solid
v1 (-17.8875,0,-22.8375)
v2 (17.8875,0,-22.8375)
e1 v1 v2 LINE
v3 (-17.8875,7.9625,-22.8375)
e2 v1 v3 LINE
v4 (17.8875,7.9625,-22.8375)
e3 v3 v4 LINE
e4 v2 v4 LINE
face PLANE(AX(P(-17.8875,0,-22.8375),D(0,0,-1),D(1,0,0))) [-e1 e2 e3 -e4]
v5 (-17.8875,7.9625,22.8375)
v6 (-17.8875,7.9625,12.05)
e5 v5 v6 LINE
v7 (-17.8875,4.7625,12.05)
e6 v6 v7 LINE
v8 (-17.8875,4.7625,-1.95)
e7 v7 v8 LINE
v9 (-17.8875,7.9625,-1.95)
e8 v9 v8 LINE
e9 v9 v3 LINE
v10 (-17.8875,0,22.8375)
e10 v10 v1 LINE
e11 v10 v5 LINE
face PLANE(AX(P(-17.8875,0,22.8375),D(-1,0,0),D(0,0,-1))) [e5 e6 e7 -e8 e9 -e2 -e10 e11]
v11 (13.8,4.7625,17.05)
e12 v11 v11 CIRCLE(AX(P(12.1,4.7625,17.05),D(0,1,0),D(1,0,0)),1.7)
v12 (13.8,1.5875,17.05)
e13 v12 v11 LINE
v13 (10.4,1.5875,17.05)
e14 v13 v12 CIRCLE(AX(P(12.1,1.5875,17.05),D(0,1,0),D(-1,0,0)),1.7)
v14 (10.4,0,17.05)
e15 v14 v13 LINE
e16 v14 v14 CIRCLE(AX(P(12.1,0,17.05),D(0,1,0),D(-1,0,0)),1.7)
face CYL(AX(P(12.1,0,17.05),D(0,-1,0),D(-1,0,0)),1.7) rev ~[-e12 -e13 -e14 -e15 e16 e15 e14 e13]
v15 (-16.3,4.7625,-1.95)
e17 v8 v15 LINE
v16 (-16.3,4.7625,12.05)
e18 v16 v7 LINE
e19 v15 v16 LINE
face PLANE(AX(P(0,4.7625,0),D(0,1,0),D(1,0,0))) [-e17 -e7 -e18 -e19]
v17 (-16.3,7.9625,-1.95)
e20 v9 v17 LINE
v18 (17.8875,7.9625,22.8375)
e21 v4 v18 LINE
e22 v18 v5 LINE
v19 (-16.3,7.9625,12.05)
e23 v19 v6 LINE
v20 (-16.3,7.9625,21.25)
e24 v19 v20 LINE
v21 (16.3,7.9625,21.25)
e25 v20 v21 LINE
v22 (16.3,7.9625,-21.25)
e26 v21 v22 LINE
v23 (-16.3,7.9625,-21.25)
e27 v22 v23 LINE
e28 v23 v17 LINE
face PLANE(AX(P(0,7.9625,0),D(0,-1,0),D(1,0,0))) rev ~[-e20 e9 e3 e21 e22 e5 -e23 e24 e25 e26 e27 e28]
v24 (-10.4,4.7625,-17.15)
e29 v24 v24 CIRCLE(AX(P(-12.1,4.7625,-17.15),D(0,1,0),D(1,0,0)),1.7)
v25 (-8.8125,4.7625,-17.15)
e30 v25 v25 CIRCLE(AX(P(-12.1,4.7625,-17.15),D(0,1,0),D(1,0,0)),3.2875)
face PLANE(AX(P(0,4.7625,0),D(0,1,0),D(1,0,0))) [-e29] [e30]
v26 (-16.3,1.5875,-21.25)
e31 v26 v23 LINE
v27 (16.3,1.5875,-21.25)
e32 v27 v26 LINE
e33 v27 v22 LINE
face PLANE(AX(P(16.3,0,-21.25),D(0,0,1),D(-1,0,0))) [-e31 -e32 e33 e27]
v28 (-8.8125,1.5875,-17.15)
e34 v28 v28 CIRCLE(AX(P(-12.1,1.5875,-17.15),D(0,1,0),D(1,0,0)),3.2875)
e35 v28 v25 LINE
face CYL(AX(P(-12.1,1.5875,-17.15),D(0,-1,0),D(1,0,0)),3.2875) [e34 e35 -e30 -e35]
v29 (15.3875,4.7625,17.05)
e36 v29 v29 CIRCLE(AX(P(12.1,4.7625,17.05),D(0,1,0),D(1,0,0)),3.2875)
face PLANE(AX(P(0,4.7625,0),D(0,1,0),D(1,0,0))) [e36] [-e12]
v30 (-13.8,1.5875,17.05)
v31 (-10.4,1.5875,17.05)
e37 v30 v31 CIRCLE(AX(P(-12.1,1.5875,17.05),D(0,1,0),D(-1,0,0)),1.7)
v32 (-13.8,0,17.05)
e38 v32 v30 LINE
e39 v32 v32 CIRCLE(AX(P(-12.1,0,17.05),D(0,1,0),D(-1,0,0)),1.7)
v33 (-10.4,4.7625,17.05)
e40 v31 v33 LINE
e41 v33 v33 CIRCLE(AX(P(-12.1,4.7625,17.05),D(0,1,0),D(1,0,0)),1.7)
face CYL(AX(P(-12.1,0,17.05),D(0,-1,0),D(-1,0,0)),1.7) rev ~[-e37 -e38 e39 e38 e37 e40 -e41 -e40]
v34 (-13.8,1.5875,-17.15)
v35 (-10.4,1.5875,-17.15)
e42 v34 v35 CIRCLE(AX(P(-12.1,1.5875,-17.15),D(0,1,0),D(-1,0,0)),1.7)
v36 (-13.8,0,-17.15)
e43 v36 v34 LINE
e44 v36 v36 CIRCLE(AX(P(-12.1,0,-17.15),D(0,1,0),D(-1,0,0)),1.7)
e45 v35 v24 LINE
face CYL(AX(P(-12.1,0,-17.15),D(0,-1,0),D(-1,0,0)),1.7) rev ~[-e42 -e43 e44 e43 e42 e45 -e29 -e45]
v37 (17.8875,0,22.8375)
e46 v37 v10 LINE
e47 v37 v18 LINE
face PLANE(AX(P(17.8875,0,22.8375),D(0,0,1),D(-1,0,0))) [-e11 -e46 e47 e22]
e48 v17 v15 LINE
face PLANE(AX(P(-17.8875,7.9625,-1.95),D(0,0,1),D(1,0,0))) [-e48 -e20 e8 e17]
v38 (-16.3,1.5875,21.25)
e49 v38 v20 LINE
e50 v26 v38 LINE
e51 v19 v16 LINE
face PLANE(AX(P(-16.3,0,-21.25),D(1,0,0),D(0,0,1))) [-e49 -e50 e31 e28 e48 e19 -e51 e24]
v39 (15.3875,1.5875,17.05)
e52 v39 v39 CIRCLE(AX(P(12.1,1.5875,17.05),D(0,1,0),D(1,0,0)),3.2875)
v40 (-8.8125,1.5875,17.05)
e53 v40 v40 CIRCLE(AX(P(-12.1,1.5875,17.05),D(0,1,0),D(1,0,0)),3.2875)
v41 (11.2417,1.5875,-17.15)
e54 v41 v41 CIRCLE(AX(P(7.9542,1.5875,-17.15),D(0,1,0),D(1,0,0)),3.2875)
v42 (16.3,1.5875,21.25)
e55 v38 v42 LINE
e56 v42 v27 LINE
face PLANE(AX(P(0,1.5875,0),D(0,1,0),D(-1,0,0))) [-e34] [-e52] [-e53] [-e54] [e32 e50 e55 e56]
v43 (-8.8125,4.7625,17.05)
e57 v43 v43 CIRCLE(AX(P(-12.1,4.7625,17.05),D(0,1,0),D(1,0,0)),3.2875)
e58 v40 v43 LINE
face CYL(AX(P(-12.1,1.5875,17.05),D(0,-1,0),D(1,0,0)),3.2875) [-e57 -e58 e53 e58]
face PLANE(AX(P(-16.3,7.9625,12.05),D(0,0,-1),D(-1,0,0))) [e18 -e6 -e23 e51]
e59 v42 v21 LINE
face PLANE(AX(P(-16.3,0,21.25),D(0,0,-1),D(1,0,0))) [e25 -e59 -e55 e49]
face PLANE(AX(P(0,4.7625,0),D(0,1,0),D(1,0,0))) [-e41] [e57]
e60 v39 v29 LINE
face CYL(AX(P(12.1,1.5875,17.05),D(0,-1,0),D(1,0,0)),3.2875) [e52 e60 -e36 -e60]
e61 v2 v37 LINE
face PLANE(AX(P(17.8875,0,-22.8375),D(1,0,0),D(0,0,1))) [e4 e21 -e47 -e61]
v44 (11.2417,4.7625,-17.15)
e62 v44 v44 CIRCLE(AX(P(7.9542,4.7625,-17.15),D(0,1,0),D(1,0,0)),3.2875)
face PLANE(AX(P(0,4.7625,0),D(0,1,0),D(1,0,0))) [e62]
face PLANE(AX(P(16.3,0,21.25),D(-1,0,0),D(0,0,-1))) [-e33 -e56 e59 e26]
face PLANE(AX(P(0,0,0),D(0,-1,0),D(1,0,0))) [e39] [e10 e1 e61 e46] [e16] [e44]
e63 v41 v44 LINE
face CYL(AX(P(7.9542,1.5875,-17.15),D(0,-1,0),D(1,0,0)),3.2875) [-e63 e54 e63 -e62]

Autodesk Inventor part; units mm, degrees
ref_plane "YZ Plane" through (0, 0, 0) normal (1, 0, 0) x (0, 1, 0)
ref_plane "XZ Plane" through (0, 0, 0) normal (0, 1, 0) x (-1, 0, 0)
ref_plane "XY Plane" through (0, 0, 0) normal (0, 0, 1) x (1, 0, 0)
sketch "Sketch1" plane through (0, 0, 0) normal (0, 1, 0) x (-1, 0, 0)
  line L0 (16.3, 21.25) -> (-16.3, 21.25)
  line L1 (-16.3, 21.25) -> (-16.3, -21.25)
  line L2 (-16.3, -21.25) -> (16.3, -21.25)
  line L3 (16.3, -21.25) -> (16.3, 21.25)
  line L4 (16.3, 21.25) -> (-16.3, -21.25) construction
  line L5 (-16.3, 21.25) -> (16.3, -21.25) construction
  circle A0 centre (12.1, 17.05) radius 1.7
  circle A1 centre (12.1, -17.15) radius 1.7
  circle A2 centre (-12.1, 17.05) radius 1.7
  point P0 (0, 0)
  dimension "d0" = 42.5
  dimension "d1" = 32.6
  dimension "d4" = 3.4
  dimension "d5" = 3.4
  dimension "d6" = 3.4
  dimension "d7" = 34.2
  dimension "d8" = 24.2
  dimension "d9" = 4.2
  dimension "d10" = 4.2
  dimension "d11" = 4.2
  dimension "d12" = 4.2
extrude "Extrusion1" add sketch "Sketch1" along normal blind 1.5875
sketch "Sketch2" plane through (0, 1.5875, 0) normal (0, 1, 0) x (1, 0, 0)
  circle A0 centre (-12.1, -17.05) radius 1.7 projected
  circle A1 centre (-12.1, -17.05) radius 1.7
  circle A2 centre (-12.1, -17.05) radius 3.2875
  circle A3 centre (12.1, -17.05) radius 1.7 projected
  circle A4 centre (12.1, -17.05) radius 1.7
  circle A5 centre (12.1, -17.05) radius 3.2875
  circle A6 centre (-12.1, 17.15) radius 1.7 projected
  circle A7 centre (-12.1, 17.15) radius 1.7
  circle A8 centre (-12.1, 17.15) radius 3.2875
  line L0 (16.3, 21.25) -> (-16.3, 21.25) construction
  line L1 (0, 21.25) -> (0, -21.2058) construction
  circle A9 centre (7.9542, 17.15) radius 3.2875
  point P0 (0, 0)
  dimension "d13" = 1.5875
  dimension "d14" = 1.5875
  dimension "d15" = 1.5875
  dimension "d28" = 6.575
  dimension "d29" = 6.575
extrude "Extrusion2" add sketch "Sketch2" along normal blind 3.175
sketch "Sketch3" plane through (0, 0, 0) normal (0, -1, 0) x (1, 0, 0)
  line L0 (17.8875, 22.8375) -> (-17.8875, 22.8375)
  line L1 (-17.8875, 22.8375) -> (-17.8875, -22.8375)
  line L2 (-17.8875, -22.8375) -> (17.8875, -22.8375)
  line L3 (17.8875, -22.8375) -> (17.8875, 22.8375)
  line L4 (17.8875, 22.8375) -> (-17.8875, -22.8375) construction
  line L5 (-17.8875, 22.8375) -> (17.8875, -22.8375) construction
  line L6 (16.3, -21.25) -> (-16.3, -21.25) projected
  line L7 (16.3, 21.25) -> (16.3, -21.25) projected
  line L8 (-16.3, 21.25) -> (16.3, 21.25)
  line L9 (16.3, 21.25) -> (16.3, -21.25)
  line L10 (16.3, -21.25) -> (-16.3, -21.25)
  line L11 (-16.3, -21.25) -> (-16.3, 21.25)
  line L12 (-16.3, 21.25) -> (16.3, -21.25) construction
  line L13 (16.3, 21.25) -> (-16.3, -21.25) construction
  point P0 (0, 0)
  point P1 (-16.3, -21.25)
  dimension "d18" = 1.5875
  dimension "d19" = 1.5875
  dimension "d26" = 35.775
  dimension "d27" = 45.675
extrude "Extrusion3" add sketch "Sketch3" against normal blind 7.9625
sketch "Sketch4" plane through (0, 7.9625, 0) normal (0, 1, 0) x (1, 0, 0)
  line L0 (-16.3, 21.25) -> (-16.3, -21.25) projected
  line L1 (-17.8875, -22.8375) -> (-17.8875, 22.8375) projected
  line L2 (-16.3, -12.05) -> (-17.8875, -12.05)
  line L3 (-17.8875, -12.05) -> (-17.8875, 1.95)
  line L4 (-17.8875, 1.95) -> (-16.3, 1.95)
  line L5 (-16.3, 1.95) -> (-16.3, -12.05)
  circle A0 centre (-12.1, -17.05) radius 1.7 construction
  circle A1 centre (-12.1, -17.05) radius 1.7 construction
  point P0 (0, 0)
  point P1 (-17.0938, -12.05)
  point P2 (-17.0938, 1.95)
  dimension "d22" = 5
  dimension "d23" = 14
extrude "Extrusion4" cut sketch "Sketch4" against normal blind 3.2
equation "\"d4\" = m3_clearance"
equation "\"d5\" = m3_clearance"
equation "\"d6\" = m3_clearance"
equation "\"d10\" = d9"
equation "\"d11\" = d9"
equation "\"d12\" = d9"
equation "\"d14\" = d13"
equation "\"d15\" = d13"
equation "\"d29\" = d28"
equation "\"m3_heat_set_insert\" = 4"
equation "\"m3_clearance\" = 3.4"
equation "\"m3_heat_set_depth\" = 7"
equation "\"robot_diameter\" = 354"
equation "\"hardboard_thickness\" = 5"
equation "\"motor_centerline_height\" = 13"
properties part number "microphone_MCU_case"
